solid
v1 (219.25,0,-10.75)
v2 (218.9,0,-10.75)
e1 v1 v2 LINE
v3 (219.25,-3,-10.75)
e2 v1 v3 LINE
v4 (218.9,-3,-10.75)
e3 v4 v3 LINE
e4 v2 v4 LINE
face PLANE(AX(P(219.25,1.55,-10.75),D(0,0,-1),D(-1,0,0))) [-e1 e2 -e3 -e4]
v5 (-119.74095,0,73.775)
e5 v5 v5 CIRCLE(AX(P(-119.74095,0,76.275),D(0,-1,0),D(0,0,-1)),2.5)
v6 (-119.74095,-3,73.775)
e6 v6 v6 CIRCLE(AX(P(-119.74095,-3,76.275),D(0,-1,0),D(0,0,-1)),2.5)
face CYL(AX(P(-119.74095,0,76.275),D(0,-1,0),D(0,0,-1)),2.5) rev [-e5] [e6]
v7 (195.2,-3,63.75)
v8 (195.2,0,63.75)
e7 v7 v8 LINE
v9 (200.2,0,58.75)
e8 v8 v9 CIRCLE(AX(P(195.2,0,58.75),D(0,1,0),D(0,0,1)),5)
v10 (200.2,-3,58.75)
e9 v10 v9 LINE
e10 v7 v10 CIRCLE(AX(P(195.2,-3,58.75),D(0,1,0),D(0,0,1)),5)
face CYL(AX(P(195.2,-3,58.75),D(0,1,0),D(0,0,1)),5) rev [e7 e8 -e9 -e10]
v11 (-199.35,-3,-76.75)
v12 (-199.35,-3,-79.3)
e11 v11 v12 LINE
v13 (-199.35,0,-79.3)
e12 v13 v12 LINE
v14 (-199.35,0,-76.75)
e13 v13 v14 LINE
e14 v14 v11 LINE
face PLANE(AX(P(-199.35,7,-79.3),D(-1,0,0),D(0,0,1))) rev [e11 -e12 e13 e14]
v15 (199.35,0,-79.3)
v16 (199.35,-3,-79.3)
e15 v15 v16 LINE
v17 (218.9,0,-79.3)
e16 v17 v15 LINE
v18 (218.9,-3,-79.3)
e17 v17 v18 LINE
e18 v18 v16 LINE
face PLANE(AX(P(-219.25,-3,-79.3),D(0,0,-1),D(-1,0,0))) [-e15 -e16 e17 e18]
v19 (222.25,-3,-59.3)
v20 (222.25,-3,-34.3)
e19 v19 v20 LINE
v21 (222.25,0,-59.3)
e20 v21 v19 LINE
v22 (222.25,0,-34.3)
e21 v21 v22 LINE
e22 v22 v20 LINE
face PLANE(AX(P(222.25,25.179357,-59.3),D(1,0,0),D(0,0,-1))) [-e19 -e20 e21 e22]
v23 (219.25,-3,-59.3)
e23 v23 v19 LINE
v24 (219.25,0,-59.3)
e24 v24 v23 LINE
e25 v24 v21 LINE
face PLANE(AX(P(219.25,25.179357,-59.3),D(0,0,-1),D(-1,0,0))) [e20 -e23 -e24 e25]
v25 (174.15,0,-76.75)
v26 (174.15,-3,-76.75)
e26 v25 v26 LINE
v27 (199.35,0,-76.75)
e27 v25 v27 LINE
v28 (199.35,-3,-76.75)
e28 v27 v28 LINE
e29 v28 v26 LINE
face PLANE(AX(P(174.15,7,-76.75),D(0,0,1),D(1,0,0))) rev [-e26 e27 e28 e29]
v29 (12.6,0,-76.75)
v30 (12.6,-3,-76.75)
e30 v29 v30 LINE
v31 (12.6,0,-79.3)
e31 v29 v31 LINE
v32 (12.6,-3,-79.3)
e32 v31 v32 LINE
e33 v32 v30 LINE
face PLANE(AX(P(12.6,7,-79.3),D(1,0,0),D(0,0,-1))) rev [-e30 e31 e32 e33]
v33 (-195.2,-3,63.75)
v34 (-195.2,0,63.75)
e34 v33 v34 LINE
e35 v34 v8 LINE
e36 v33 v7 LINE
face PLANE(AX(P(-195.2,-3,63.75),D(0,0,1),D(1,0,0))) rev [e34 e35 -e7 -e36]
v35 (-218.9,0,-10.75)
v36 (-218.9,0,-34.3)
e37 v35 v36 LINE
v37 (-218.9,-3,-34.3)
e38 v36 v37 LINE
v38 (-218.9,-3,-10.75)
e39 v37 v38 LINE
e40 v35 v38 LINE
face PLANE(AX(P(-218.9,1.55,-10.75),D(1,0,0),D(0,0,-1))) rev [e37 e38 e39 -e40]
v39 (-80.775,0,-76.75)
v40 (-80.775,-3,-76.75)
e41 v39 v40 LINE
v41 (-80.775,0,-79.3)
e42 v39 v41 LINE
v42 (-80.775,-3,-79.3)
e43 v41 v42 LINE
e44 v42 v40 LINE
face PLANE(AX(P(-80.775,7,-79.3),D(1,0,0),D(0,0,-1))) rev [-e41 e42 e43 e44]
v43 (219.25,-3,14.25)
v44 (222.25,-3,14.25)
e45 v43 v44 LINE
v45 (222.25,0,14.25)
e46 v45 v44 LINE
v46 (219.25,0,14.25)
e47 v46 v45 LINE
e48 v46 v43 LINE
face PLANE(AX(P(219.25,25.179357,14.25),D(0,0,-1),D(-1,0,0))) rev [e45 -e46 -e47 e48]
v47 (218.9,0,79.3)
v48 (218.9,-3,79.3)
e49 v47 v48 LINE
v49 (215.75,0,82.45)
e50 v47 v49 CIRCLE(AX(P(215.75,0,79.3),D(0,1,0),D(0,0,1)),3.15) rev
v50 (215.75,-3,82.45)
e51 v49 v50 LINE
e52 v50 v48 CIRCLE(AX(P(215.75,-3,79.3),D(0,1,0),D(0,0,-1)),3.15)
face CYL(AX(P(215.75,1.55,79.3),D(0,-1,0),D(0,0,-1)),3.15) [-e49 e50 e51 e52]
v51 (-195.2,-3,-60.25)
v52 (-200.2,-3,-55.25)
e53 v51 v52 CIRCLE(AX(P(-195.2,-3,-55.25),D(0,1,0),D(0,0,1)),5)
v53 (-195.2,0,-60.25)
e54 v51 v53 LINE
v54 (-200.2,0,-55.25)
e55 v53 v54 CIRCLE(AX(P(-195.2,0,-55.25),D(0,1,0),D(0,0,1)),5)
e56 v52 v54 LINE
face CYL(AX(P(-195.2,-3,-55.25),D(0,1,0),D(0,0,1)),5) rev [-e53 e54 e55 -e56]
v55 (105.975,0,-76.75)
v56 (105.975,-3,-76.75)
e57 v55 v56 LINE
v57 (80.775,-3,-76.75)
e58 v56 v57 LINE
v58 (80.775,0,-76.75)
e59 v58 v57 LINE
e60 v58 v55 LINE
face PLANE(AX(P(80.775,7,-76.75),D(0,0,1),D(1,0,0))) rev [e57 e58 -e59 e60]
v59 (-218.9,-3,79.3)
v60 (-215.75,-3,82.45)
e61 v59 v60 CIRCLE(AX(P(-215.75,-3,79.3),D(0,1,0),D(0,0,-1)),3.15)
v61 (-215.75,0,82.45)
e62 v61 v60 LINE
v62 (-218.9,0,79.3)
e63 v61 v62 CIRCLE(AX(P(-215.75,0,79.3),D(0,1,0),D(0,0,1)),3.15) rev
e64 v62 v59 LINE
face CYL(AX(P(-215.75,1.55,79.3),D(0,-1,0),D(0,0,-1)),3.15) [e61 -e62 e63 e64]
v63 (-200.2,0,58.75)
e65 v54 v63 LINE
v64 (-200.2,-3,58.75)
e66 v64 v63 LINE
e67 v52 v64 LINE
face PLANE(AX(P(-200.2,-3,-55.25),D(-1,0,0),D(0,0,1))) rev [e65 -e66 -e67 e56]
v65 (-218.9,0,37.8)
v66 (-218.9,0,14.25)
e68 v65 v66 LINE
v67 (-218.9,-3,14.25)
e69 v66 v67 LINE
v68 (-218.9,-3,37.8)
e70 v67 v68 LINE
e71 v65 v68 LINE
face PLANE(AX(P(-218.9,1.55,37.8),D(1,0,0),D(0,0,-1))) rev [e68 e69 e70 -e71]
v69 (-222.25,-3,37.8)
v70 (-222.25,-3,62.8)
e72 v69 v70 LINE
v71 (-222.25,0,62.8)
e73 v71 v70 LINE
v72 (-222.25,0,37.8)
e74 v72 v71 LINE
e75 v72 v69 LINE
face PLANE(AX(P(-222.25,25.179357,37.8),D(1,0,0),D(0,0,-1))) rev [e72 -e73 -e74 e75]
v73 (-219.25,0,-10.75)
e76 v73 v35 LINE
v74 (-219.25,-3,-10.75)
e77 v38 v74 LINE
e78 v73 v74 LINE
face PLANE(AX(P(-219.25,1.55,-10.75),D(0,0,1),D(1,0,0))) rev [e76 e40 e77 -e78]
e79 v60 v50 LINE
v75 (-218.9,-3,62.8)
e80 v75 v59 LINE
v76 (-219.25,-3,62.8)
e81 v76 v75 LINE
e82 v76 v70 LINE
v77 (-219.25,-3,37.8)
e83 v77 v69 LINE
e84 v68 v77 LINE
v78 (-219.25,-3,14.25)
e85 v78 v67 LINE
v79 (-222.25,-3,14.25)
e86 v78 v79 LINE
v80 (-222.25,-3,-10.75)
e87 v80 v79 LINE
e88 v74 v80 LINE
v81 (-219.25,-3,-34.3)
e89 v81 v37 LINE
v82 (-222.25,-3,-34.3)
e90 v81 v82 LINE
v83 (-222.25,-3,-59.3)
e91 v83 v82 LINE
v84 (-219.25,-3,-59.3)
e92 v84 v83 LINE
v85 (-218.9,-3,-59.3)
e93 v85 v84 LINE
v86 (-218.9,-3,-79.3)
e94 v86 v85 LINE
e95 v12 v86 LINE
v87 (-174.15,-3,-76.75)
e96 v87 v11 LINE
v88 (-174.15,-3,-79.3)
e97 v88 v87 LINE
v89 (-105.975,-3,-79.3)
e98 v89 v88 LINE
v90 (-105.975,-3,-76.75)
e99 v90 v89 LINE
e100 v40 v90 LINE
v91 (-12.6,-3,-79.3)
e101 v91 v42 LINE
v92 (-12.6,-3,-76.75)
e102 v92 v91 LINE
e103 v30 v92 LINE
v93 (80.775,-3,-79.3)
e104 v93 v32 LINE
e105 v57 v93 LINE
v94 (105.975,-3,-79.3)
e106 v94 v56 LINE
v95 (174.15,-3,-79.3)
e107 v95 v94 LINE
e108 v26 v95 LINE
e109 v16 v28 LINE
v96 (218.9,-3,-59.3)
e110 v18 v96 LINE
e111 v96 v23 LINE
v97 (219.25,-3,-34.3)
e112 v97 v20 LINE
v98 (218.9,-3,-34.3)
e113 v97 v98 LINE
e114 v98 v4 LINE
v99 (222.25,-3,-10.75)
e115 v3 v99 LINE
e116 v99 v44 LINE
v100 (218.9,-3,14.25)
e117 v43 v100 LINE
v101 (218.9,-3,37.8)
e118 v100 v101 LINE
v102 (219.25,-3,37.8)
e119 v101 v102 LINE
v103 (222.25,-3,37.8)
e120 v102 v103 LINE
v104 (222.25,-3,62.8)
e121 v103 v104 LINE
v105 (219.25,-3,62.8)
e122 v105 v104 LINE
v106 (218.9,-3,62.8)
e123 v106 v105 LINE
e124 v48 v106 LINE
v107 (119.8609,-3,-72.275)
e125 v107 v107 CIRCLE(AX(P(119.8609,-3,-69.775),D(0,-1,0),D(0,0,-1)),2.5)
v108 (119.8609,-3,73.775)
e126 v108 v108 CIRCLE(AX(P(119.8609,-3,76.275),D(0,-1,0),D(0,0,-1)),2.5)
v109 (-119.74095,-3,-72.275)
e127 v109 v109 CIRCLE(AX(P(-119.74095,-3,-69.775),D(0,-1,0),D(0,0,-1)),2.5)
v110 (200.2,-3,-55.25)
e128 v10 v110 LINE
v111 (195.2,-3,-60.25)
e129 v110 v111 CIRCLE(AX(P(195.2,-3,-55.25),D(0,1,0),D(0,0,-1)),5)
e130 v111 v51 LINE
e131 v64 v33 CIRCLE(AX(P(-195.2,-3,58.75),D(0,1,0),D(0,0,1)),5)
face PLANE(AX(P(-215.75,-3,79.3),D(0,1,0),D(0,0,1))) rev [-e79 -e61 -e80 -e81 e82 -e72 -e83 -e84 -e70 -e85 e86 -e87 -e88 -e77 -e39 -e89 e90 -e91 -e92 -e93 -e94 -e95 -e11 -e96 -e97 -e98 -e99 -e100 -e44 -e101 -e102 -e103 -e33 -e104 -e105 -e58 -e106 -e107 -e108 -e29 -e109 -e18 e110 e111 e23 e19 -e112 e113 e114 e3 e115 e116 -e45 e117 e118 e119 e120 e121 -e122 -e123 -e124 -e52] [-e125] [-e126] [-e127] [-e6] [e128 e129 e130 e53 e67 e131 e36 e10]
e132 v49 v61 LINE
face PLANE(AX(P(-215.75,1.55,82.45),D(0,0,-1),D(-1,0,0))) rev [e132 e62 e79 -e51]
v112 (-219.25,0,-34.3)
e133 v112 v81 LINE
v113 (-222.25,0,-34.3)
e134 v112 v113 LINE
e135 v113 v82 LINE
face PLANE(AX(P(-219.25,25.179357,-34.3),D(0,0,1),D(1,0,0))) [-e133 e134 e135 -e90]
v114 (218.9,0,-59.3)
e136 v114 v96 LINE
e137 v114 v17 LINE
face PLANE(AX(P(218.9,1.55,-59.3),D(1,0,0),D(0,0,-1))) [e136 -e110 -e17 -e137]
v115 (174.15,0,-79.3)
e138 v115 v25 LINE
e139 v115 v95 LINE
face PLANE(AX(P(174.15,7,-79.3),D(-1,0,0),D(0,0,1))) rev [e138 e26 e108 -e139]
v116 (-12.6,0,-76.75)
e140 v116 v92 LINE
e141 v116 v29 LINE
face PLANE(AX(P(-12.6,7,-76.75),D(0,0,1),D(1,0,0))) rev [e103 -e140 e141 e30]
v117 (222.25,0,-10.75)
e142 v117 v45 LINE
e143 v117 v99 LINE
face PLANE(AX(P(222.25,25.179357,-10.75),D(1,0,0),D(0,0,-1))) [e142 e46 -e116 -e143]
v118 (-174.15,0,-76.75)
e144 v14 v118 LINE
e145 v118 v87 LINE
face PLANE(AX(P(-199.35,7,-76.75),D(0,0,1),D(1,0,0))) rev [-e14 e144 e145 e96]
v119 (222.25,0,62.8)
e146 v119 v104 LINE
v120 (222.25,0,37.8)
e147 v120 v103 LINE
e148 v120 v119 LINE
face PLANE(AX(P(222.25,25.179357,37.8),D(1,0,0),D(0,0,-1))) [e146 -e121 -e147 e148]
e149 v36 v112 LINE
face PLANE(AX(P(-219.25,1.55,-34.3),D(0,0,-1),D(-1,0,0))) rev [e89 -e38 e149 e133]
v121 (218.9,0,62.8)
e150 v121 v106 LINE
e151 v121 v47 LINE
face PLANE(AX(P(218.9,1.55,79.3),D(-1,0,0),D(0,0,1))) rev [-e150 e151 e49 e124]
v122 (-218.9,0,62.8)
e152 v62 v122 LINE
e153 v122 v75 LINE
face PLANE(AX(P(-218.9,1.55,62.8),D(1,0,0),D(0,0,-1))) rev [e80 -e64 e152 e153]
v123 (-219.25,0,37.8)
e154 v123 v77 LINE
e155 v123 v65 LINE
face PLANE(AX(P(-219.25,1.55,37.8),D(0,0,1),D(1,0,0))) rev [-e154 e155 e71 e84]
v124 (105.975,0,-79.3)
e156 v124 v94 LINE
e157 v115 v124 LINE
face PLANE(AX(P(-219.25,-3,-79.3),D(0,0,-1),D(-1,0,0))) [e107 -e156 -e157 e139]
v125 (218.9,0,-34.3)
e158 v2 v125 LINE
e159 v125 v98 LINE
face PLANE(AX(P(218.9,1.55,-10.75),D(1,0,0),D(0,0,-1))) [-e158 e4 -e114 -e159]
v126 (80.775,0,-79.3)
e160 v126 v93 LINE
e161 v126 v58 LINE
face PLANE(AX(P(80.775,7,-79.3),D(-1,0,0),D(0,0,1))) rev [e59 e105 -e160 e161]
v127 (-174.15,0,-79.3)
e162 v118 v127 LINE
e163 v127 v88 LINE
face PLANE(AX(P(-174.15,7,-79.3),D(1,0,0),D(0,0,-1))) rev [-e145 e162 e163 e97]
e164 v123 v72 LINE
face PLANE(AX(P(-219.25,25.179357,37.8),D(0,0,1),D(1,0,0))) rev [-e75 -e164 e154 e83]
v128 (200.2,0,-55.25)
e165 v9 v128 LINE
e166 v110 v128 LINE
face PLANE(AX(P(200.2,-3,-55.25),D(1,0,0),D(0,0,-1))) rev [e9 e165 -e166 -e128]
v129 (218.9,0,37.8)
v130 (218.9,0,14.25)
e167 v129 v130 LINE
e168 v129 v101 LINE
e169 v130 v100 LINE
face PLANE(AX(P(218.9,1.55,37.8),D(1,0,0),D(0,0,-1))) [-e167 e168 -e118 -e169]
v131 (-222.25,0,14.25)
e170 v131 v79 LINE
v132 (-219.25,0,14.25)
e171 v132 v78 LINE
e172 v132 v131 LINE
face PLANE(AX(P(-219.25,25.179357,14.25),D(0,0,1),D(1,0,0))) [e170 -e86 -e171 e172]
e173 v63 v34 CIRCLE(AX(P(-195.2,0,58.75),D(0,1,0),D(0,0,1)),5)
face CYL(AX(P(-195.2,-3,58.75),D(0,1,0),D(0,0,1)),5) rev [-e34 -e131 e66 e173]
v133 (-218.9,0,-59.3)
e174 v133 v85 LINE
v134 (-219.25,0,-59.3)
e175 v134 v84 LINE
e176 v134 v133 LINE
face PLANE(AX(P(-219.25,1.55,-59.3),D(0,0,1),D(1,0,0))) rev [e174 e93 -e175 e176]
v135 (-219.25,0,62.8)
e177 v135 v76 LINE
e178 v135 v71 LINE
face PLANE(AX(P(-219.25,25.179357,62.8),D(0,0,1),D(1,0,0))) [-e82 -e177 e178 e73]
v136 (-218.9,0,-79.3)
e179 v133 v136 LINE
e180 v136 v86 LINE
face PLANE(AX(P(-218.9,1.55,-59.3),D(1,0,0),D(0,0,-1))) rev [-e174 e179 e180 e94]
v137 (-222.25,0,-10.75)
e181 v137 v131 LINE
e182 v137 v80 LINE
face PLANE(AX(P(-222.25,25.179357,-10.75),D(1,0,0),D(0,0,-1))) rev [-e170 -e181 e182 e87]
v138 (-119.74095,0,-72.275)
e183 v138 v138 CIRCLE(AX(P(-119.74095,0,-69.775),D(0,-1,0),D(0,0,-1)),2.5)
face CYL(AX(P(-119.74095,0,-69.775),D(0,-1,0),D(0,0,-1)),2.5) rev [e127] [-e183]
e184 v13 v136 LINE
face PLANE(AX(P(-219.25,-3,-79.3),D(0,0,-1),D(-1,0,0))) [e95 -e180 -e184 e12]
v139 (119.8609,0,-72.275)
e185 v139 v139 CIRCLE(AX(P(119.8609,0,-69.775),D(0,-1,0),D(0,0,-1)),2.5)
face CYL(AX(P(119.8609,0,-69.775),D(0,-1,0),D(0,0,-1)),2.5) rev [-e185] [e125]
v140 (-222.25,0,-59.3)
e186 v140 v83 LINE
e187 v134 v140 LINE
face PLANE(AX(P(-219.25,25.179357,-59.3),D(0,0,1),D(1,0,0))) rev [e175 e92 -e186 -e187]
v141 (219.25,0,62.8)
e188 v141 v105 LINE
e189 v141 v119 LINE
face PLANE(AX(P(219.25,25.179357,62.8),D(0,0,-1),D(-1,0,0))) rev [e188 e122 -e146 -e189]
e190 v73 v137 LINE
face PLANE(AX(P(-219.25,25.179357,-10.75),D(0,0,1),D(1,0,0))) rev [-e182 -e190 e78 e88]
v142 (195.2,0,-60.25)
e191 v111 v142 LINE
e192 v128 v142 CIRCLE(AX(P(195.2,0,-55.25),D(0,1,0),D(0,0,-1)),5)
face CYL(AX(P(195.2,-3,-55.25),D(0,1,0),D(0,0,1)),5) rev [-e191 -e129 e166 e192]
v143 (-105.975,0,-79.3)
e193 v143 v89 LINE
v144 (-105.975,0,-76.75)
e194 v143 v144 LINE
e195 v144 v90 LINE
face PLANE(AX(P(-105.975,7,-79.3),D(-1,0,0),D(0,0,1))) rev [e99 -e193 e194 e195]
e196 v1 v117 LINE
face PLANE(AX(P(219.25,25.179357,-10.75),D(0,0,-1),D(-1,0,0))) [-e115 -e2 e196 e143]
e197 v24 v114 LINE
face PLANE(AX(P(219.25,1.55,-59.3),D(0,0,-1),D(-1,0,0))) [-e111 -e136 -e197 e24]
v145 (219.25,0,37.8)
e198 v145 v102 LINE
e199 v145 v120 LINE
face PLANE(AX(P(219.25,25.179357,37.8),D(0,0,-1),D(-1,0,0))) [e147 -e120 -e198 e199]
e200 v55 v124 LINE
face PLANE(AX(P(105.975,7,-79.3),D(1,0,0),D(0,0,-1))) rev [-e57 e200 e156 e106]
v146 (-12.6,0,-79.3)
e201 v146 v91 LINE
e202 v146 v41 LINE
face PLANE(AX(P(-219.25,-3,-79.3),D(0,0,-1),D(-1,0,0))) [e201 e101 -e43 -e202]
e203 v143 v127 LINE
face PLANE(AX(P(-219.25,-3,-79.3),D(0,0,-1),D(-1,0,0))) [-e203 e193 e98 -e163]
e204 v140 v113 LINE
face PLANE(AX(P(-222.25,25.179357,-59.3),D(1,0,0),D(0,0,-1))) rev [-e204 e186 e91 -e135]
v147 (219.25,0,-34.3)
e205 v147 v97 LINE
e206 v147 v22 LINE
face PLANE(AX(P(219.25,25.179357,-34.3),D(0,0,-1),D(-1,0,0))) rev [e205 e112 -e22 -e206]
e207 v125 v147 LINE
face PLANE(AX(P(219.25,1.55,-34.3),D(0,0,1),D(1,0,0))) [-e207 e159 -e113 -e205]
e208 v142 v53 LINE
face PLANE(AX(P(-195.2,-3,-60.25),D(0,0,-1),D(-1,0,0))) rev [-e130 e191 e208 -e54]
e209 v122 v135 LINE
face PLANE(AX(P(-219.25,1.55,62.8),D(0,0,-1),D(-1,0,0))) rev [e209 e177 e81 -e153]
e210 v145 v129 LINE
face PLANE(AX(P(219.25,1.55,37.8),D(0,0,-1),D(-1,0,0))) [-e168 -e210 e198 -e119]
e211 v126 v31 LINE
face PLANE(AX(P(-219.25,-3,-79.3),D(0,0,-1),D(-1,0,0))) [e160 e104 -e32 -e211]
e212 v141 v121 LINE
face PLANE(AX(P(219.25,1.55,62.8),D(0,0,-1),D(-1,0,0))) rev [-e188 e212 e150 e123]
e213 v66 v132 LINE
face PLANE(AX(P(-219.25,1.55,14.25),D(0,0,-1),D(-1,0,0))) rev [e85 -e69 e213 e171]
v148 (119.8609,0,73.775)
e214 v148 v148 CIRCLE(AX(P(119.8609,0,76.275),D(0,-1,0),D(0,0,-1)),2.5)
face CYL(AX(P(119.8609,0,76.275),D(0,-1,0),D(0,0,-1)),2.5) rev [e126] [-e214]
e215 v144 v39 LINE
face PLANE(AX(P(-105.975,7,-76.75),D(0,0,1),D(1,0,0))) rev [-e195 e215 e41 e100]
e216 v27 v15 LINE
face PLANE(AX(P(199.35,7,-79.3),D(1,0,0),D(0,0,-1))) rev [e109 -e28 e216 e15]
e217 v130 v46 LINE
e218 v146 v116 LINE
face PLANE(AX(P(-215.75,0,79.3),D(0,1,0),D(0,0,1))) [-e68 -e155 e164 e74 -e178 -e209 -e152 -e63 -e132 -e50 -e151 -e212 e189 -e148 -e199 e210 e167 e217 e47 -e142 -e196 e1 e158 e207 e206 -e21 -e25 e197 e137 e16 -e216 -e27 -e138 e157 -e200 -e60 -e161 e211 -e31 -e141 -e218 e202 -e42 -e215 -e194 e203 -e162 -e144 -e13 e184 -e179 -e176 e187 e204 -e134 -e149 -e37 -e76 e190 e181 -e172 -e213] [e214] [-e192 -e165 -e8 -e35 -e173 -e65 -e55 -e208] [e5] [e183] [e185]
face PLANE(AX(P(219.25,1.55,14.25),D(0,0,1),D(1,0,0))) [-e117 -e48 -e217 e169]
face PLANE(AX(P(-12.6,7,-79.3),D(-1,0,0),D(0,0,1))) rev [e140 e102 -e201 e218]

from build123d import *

# Parameters (mm, degrees)
BASE_FLANGE1_DEPTH  = 3
SKETCH7_W           = 25.2
SKETCH7_H           = 2.55
CUT_EXTRUDE1_DEPTH  = 10
SKETCH8_W           = 3
SKETCH8_H           = 25
BOSS_EXTRUDE1_DEPTH = 3
SKETCH9_W           = 0.35
SKETCH9_H           = 20
SKETCH9_H_2         = 23.55
CUT_EXTRUDE2_DEPTH  = 4.55
CUT_EXTRUDE3_START  = -4.55
CUT_EXTRUDE3_DEPTH  = 4.55
SKETCH11_R          = 2.5
CUT_EXTRUDE4_DEPTH  = 238.069747121


# Sheet-metal steps are written as plain solids
with BuildPart() as part:
    # Sketch1 → Base-Flange1 (new body)
    with BuildSketch(Plane(origin=(0, 0, 0), x_dir=(1, 0, 0), z_dir=(0, 1, 0))):
        with BuildLine():
            Line((-219.25, 79.3), (219.25, 79.3))
            Line((219.25, 79.3), (219.25, -79.3))
            ThreePointArc((219.25, -79.3), (218.224873734, -81.774873734), (215.75, -82.8))
            Line((215.75, -82.8), (-215.75, -82.8))
            ThreePointArc((-215.75, -82.8), (-218.224873734, -81.774873734), (-219.25, -79.3))
            Line((-219.25, -79.3), (-219.25, 79.3))
        make_face()
        with BuildLine():
            Line((-195.2, 60.25), (195.2, 60.25))
            ThreePointArc((195.2, 60.25), (198.735533906, 58.785533906), (200.2, 55.25))
            Line((200.2, 55.25), (200.2, -58.75))
            ThreePointArc((200.2, -58.75), (198.735533906, -62.285533906), (195.2, -63.75))
            Line((195.2, -63.75), (-195.2, -63.75))
            ThreePointArc((-195.2, -63.75), (-198.735533906, -62.285533906), (-200.2, -58.75))
            Line((-200.2, -58.75), (-200.2, 55.25))
            ThreePointArc((-200.2, 55.25), (-198.735533906, 58.785533906), (-195.2, 60.25))
        make_face(mode=Mode.SUBTRACT)
    extrude(amount=-BASE_FLANGE1_DEPTH)

    # Sketch7 → Cut-Extrude1 (cut)
    with BuildSketch(Plane.XZ.offset(3)):
        with Locations((186.75, -78.025)):
            Rectangle(SKETCH7_W, SKETCH7_H)
        with Locations((93.375, -78.025)):
            Rectangle(SKETCH7_W, SKETCH7_H)
        with Locations((0, -78.025)):
            Rectangle(SKETCH7_W, SKETCH7_H)
        with Locations((-93.375, -78.025)):
            Rectangle(SKETCH7_W, SKETCH7_H)
        with Locations((-186.75, -78.025)):
            Rectangle(SKETCH7_W, SKETCH7_H)
    extrude(amount=-CUT_EXTRUDE1_DEPTH, mode=Mode.SUBTRACT)

    # Sketch8 → Boss-Extrude1 (add)
    with BuildSketch(Plane.XZ.offset(3)):
        with Locations((-220.75, -46.8)):
            Rectangle(SKETCH8_W, SKETCH8_H)
        with Locations((-220.75, 1.75)):
            Rectangle(SKETCH8_W, SKETCH8_H)
        with Locations((-220.75, 50.3)):
            Rectangle(SKETCH8_W, SKETCH8_H)
    boss_extrude1 = extrude(amount=-BOSS_EXTRUDE1_DEPTH)

    # Sketch9 → Cut-Extrude2 (cut)
    with BuildSketch(Plane.XZ.offset(3)):
        with Locations((-219.075, -69.3)):
            Rectangle(SKETCH9_W, SKETCH9_H)
        with Locations((-219.075, -22.525)):
            Rectangle(SKETCH9_W, SKETCH9_H_2)
        with Locations((-219.075, 26.025)):
            Rectangle(SKETCH9_W, SKETCH9_H_2)
    cut_extrude2 = extrude(amount=-CUT_EXTRUDE2_DEPTH, mode=Mode.SUBTRACT)

    # Mirror1: Boss-Extrude1, Cut-Extrude2 across plane
    add(boss_extrude1.mirror(Plane(origin=(0, 0, 0), x_dir=(0, 0, 1), z_dir=(1, 0, 0))))
    add(cut_extrude2.mirror(Plane(origin=(0, 0, 0), x_dir=(0, 0, 1), z_dir=(1, 0, 0))), mode=Mode.SUBTRACT)

    # Sketch10 → Cut-Extrude3 (cut)
    with BuildSketch(Plane.XZ.offset(3).offset(CUT_EXTRUDE3_START)):
        with BuildLine():
            Line((219.25, 79.3), (219.25, 62.8))
            Line((219.25, 62.8), (218.9, 62.8))
            Line((218.9, 62.8), (218.9, 79.3))
            ThreePointArc((218.9, 79.3), (217.977386361, 81.527386361), (215.75, 82.45))
            Line((215.75, 82.45), (-215.75, 82.45))
            ThreePointArc((-215.75, 82.45), (-217.977386361, 81.527386361), (-218.9, 79.3))
            Line((-218.9, 79.3), (-218.9, 62.8))
            Line((-218.9, 62.8), (-219.25, 62.8))
            Line((-219.25, 62.8), (-219.25, 79.3))
            ThreePointArc((-219.25, 79.3), (-218.224873734, 81.774873734), (-215.75, 82.8))
            Line((-215.75, 82.8), (215.75, 82.8))
            ThreePointArc((215.75, 82.8), (218.224873734, 81.774873734), (219.25, 79.3))
        make_face()
    extrude(amount=CUT_EXTRUDE3_DEPTH, mode=Mode.SUBTRACT)

    # Sketch11 → Cut-Extrude4 (cut, through all)
    with BuildSketch(Plane.XZ.offset(3)):
        with Locations(Location((-119.740950076, 76.275, 0), (0, 0, 270))):
            Circle(SKETCH11_R)
        with Locations(Location((-119.740950076, -69.775, 0), (0, 0, 270))):
            Circle(SKETCH11_R)
        with Locations(Location((119.860899699, -69.775, 0), (0, 0, 270))):
            Circle(SKETCH11_R)
        with Locations(Location((119.860899699, 76.275, 0), (0, 0, 270))):
            Circle(SKETCH11_R)
    extrude(amount=-CUT_EXTRUDE4_DEPTH, mode=Mode.SUBTRACT)


solid = part.part
